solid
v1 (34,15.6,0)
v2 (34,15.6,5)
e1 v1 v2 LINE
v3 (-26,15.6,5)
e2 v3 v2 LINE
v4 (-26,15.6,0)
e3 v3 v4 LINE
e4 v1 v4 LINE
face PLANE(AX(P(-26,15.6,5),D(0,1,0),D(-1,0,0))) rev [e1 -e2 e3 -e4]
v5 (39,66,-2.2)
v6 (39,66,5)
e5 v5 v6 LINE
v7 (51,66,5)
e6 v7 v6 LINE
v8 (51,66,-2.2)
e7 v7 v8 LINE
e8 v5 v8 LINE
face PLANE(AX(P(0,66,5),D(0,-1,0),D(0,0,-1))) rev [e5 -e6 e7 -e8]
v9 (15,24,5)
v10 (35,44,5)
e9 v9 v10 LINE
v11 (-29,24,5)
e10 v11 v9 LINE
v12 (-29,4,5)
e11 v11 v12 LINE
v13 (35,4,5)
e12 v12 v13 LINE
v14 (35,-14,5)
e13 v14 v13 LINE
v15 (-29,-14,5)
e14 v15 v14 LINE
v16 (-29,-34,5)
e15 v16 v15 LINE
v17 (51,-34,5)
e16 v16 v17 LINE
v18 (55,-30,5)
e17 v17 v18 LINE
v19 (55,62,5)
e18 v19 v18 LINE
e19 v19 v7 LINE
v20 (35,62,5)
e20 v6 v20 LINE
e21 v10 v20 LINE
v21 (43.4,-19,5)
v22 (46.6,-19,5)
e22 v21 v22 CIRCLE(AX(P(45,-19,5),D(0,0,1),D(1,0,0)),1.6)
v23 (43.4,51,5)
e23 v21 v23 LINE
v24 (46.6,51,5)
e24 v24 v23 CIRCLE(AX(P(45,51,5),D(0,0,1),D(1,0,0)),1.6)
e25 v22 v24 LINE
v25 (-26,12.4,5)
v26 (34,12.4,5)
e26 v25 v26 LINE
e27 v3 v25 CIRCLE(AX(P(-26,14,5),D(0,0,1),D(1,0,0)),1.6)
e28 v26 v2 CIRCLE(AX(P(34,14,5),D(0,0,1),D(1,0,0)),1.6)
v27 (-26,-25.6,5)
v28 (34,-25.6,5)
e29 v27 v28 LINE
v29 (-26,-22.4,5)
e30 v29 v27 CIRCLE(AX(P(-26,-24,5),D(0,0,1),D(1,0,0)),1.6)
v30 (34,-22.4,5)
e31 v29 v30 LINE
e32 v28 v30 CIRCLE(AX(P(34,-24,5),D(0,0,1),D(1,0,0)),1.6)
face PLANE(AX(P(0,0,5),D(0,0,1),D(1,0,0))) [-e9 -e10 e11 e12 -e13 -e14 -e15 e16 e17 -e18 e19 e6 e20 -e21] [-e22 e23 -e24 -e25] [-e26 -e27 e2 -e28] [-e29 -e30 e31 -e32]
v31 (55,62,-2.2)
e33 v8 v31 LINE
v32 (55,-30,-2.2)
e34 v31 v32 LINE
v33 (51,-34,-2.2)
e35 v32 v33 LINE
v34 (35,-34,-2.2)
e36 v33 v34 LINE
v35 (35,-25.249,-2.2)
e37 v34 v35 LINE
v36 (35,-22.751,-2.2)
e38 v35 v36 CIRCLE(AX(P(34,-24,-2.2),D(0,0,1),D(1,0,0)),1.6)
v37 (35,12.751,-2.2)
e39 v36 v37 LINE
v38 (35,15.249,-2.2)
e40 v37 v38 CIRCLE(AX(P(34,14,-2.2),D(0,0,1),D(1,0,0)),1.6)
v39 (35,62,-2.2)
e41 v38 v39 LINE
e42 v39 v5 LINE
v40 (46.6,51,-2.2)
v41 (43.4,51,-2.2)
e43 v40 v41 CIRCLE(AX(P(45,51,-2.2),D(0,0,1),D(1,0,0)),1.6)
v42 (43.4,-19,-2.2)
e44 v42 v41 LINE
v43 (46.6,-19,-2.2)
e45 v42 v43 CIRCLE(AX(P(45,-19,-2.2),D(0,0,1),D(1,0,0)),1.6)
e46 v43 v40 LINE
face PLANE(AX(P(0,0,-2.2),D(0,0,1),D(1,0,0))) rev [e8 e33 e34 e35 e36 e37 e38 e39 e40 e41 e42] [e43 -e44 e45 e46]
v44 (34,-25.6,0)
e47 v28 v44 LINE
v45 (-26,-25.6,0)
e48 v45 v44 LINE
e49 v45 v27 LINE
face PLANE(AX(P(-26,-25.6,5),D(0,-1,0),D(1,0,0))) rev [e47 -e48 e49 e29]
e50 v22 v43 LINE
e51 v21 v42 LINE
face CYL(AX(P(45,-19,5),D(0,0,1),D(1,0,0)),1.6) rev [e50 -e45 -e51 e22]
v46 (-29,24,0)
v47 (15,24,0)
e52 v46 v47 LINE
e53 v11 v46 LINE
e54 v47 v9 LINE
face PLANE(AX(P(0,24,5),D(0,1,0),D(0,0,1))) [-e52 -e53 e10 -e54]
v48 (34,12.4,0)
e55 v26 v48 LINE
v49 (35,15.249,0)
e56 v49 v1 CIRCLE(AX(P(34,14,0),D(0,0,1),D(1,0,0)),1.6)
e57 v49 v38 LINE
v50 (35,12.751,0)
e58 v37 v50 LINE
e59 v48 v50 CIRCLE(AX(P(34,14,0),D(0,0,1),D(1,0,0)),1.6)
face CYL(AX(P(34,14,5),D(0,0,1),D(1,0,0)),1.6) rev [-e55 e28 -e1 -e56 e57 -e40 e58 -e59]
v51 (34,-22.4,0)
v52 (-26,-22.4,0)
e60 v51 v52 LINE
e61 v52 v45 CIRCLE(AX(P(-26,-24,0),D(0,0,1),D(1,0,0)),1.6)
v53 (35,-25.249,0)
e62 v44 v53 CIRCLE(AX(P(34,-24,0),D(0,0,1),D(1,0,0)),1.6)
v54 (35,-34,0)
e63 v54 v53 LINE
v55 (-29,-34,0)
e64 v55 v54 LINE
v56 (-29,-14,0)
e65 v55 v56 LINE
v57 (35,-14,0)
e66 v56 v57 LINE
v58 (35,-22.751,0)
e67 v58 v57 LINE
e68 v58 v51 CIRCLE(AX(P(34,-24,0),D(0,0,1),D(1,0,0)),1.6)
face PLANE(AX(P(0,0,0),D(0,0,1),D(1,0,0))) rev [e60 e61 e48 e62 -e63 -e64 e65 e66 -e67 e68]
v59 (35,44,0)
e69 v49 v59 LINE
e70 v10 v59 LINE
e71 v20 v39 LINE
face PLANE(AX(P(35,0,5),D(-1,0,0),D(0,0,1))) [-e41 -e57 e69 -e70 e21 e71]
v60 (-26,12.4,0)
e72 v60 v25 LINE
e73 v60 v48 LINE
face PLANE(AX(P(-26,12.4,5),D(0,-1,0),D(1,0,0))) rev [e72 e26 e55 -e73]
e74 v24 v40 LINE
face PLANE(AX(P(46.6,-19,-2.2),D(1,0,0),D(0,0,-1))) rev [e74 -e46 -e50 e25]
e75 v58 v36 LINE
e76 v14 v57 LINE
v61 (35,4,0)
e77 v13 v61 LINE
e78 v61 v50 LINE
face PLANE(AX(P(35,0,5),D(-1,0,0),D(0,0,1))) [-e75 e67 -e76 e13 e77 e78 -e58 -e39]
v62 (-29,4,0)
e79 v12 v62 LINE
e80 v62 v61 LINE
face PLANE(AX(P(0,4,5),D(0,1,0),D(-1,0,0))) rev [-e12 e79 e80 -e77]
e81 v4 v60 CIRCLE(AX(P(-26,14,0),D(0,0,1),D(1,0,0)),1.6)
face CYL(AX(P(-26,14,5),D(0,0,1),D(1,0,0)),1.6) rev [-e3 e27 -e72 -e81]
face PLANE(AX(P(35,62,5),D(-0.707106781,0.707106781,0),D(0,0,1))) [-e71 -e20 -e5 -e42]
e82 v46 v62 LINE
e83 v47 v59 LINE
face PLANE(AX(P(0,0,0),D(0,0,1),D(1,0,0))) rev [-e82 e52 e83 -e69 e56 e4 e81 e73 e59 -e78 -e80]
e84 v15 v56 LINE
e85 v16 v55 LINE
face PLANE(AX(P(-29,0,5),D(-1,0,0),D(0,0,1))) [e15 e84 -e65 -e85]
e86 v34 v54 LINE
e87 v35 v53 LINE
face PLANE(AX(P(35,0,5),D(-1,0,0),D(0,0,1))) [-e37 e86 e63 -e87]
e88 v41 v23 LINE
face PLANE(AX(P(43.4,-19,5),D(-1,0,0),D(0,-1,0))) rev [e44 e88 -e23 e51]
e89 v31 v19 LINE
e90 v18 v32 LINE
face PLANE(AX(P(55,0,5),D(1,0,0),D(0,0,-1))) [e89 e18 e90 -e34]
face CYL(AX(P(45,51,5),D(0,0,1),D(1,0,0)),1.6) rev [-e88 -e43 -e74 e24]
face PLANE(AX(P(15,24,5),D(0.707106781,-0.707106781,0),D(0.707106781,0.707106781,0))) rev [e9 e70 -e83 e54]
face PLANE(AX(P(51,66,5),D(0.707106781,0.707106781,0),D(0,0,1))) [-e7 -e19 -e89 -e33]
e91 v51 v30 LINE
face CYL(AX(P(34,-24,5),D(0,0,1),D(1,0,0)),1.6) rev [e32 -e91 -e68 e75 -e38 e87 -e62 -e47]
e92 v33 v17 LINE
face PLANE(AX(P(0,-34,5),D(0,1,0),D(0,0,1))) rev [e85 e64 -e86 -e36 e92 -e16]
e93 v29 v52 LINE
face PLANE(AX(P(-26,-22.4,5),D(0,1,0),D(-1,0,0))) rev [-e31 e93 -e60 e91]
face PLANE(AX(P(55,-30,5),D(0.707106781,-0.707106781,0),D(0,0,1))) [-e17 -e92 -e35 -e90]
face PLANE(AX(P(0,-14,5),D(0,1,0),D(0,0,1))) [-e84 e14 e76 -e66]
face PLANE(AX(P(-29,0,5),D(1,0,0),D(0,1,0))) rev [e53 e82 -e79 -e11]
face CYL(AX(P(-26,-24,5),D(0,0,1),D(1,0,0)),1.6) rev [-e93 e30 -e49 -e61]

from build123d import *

# Parameters (mm, degrees)
SKETCH_1_W                  = 20
SKETCH_1_H                  = 20
SKETCH_1_W_2                = 64
SKETCH_1_H_2                = 18
SKETCH_1_H_3                = 42
EXTRUDE_1_DEPTH             = 5
SKETCH_2_W                  = 20
SKETCH_2_H                  = 100
EXTRUDE_2_DEPTH             = 2.2
HOLE_START                  = -2.2
HOLE_WIZARD_3_2_3_2_1_DEPTH = 7.2
HOLE_WIZARD_3_2_3_2_2_DEPTH = 7.2
RIB_1_REACH                 = 88.214
SKETCH_11_WALL_W            = 202.712111226
SKETCH_11_WALL_H            = 5
CHAMFER_1_SIZE              = 4


# Read off the part's stored shape, not the designer's step: Ø3.2 (3.2) 直径槽口1, Ø3.2 (3.2) 直径槽口2
with BuildPart() as part:
    # 草图1 → 凸台-拉伸1 (new body)
    with BuildSketch(Plane.XY):
        with Locations((45, -24)):
            Rectangle(SKETCH_1_W, SKETCH_1_H)
        with Locations((3, -24)):
            Rectangle(SKETCH_1_W_2, SKETCH_1_H)
        with Locations((3, 14)):
            Rectangle(SKETCH_1_W_2, SKETCH_1_H)
        with Locations((45, -5)):
            Rectangle(SKETCH_1_W, SKETCH_1_H_2)
        with Locations((45, 45)):
            Rectangle(SKETCH_1_W, SKETCH_1_H_3)
        with Locations((45, 14)):
            Rectangle(SKETCH_1_W, SKETCH_1_H)
    extrude(amount=EXTRUDE_1_DEPTH)

    # 草图2 → 凸台-拉伸2 (add)
    with BuildSketch(Plane(origin=(0, 0, 0), x_dir=(-1, 0, 0), z_dir=(0, 0, -1))):
        with Locations((-45, 16)):
            Rectangle(SKETCH_2_W, SKETCH_2_H)
    extrude(amount=EXTRUDE_2_DEPTH)

    # Ø3.2 (3.2) 直径槽口1 outline → Ø3.2 (3.2) 直径槽口1 (cut)
    with BuildSketch(Plane.XY.offset(HOLE_START)):
        with BuildLine():
            Line((34, -22.4), (-26, -22.4))
            ThreePointArc((-26, -22.4), (-27.6, -24), (-26, -25.6))
            Line((-26, -25.6), (34, -25.6))
            ThreePointArc((34, -25.6), (35.6, -24), (34, -22.4))
        make_face()
        with BuildLine():
            ThreePointArc((34, 12.4), (35.6, 14), (34, 15.6))
            Line((34, 15.6), (-26, 15.6))
            ThreePointArc((-26, 15.6), (-27.6, 14), (-26, 12.4))
            Line((-26, 12.4), (34, 12.4))
        make_face()
    extrude(amount=HOLE_WIZARD_3_2_3_2_1_DEPTH, mode=Mode.SUBTRACT)

    # Ø3.2 (3.2) 直径槽口2 outline → Ø3.2 (3.2) 直径槽口2 (cut)
    with BuildSketch(Plane.XY.offset(HOLE_START)):
        with BuildLine():
            Line((46.6, -19), (46.6, 51))
            ThreePointArc((46.6, 51), (45, 52.6), (43.4, 51))
            Line((43.4, 51), (43.4, -19))
            ThreePointArc((43.4, -19), (45, -20.6), (46.6, -19))
        make_face()
    extrude(amount=HOLE_WIZARD_3_2_3_2_2_DEPTH, mode=Mode.SUBTRACT)

    # 草图11 wall → 筋1 (add, up to next)
    with BuildSketch(Plane(origin=(25, 34, 5), x_dir=(0.707106781187, 0.707106781187, 0), z_dir=(-0.707106781187, 0.707106781187, 0)), mode=Mode.PRIVATE) as rib_1_sk1:
        with Locations((0, 2.5)):
            Rectangle(SKETCH_11_WALL_W, SKETCH_11_WALL_H)
    rib_1_tool1 = extrude(rib_1_sk1.sketch, amount=-RIB_1_REACH, mode=Mode.PRIVATE) - part.part
    add(rib_1_tool1.solids().sort_by_distance((25, 34, 5))[0])

    # 倒角1
    chamfer_1_edges = [part.edges().sort_by_distance(p)[0] for p in [
        (35, 66, 1.4),
        (55, 66, 1.4),
        (55, -34, 1.4),
    ]]
    chamfer(chamfer_1_edges, length=CHAMFER_1_SIZE)


solid = part.part
